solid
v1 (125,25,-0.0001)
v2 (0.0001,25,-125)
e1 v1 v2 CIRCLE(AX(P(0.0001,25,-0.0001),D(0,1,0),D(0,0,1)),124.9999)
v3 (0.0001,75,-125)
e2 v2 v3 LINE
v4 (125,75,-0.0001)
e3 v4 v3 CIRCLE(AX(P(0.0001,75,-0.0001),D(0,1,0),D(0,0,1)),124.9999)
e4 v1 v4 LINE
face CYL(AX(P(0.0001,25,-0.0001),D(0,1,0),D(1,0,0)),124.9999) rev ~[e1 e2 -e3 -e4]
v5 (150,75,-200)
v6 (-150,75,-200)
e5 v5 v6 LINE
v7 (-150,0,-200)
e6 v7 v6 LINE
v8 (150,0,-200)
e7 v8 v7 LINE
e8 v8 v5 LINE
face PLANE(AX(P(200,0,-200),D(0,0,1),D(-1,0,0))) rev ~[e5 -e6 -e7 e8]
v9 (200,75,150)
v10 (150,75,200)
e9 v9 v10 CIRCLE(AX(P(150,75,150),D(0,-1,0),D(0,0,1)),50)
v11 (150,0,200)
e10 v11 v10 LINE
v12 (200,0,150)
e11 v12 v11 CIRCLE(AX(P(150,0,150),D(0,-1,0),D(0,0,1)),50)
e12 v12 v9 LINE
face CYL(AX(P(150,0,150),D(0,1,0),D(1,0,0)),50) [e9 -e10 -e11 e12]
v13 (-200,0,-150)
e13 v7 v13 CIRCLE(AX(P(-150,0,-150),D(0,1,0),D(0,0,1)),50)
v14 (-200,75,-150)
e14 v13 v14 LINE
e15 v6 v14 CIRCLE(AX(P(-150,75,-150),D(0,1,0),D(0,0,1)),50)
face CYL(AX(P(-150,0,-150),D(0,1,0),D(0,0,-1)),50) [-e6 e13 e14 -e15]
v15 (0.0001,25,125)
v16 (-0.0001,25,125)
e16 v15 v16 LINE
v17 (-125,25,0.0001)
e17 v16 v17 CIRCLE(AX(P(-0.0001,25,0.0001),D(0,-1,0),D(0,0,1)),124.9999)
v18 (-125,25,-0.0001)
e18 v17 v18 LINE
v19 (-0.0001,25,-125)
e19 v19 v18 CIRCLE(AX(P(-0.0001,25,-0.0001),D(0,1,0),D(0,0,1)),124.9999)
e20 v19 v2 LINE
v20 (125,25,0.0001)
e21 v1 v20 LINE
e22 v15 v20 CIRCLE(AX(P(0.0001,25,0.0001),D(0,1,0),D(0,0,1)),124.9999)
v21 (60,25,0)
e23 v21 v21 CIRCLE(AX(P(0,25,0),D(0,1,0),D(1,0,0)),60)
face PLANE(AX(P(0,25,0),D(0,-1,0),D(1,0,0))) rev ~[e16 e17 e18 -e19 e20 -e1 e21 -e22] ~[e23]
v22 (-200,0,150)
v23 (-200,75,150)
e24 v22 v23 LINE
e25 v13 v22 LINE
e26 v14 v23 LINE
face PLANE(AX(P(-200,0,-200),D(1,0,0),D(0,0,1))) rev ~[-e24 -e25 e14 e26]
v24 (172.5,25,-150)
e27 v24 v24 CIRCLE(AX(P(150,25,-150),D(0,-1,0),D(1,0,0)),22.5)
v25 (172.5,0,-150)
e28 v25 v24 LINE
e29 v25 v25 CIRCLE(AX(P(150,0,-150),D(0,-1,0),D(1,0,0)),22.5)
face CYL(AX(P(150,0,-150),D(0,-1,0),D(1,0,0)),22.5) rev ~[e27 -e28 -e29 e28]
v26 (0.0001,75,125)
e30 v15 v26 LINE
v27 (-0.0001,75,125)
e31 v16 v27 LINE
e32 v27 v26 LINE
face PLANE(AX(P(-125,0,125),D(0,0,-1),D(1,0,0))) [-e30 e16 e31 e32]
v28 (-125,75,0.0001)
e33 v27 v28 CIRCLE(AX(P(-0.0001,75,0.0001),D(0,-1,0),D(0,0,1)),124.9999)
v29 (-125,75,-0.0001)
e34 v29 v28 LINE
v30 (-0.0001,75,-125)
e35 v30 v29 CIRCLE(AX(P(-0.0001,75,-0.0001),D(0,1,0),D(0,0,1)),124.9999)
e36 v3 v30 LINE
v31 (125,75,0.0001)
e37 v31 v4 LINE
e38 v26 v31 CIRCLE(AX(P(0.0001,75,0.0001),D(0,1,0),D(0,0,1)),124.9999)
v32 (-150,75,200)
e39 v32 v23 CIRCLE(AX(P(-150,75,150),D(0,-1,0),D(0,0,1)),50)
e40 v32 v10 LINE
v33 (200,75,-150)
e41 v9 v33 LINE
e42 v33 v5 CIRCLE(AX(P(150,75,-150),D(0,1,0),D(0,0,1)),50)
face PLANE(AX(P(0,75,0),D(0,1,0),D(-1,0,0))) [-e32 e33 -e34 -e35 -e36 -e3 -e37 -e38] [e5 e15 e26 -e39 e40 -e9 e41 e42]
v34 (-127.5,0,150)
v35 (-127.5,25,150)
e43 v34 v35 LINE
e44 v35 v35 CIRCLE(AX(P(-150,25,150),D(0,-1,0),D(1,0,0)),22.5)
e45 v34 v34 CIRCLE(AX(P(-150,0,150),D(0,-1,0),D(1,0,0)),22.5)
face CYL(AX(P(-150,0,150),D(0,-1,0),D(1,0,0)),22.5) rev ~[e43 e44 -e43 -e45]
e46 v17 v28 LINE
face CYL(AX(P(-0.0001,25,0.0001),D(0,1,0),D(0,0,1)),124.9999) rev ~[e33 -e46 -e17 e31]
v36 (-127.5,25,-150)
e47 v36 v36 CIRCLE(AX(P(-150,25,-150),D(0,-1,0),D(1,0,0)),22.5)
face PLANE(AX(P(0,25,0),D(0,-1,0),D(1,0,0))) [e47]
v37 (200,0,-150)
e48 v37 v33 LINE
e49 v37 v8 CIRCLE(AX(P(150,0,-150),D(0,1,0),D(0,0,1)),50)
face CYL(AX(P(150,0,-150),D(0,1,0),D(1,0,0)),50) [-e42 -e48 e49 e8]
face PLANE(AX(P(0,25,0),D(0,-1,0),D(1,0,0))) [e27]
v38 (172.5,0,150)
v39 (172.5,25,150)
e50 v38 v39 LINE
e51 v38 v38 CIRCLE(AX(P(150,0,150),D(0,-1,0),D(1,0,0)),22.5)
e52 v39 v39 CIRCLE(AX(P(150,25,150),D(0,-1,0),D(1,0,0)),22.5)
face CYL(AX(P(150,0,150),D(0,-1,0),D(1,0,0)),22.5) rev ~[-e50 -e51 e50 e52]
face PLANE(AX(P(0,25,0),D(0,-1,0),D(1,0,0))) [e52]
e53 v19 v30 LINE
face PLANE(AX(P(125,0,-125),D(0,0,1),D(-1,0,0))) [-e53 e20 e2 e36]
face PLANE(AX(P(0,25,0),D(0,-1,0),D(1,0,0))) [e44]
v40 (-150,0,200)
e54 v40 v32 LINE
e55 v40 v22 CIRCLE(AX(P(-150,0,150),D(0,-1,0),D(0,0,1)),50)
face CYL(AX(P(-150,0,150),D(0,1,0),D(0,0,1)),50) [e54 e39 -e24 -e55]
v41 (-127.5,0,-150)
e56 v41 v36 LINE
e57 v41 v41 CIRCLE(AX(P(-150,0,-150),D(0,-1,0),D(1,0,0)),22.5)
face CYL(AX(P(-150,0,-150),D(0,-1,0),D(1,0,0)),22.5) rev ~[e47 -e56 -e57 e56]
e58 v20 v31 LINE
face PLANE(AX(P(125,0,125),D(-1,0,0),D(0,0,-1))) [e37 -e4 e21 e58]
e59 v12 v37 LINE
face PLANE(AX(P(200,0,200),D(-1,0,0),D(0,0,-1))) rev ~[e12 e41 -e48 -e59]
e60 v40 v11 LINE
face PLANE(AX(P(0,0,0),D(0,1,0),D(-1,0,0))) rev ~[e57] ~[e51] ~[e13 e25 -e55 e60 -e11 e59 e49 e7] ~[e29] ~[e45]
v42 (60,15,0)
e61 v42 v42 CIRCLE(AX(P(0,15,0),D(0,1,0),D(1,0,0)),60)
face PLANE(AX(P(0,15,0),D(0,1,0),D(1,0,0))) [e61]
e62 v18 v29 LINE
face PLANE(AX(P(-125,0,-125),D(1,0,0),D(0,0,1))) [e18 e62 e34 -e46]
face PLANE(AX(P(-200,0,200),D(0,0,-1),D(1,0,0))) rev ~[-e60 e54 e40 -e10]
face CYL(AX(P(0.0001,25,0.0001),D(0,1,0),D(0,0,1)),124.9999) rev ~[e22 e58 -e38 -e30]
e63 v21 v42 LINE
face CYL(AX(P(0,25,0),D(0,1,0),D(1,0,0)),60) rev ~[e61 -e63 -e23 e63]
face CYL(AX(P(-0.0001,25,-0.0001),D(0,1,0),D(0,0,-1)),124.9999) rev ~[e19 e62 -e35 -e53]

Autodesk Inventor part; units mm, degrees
ref_plane "YZ Plane" through (0, 0, 0) normal (1, 0, 0) x (0, 1, 0)
ref_plane "XZ Plane" through (0, 0, 0) normal (0, 1, 0) x (-1, 0, 0)
ref_plane "XY Plane" through (0, 0, 0) normal (0, 0, 1) x (1, 0, 0)
sketch "Sketch1" plane through (0, 0, 0) normal (0, 1, 0) x (-1, 0, 0)
  line L0 (125, 125) -> (-125, 125)
  line L1 (-125, 125) -> (-125, -125)
  line L2 (-125, -125) -> (125, -125)
  line L3 (125, -125) -> (125, 125)
  line L4 (125, 125) -> (-125, -125) construction
  line L5 (-125, 125) -> (125, -125) construction
  line L6 (-200, -200) -> (200, -200)
  line L7 (200, -200) -> (200, 200)
  line L8 (200, 200) -> (-200, 200)
  line L9 (-200, 200) -> (-200, -200)
  line L10 (-200, -200) -> (200, 200) construction
  line L11 (200, -200) -> (-200, 200) construction
  point P0 (0, 0)
  dimension "d0" = 250
  dimension "d1" = 250
  dimension "d2" = 400
  dimension "d3" = 400
extrude "Extrusion1" add sketch "Sketch1" along normal blind 75
sketch "Sketch2" plane through (0, 0, 0) normal (0, -1, 0) x (1, 0, 0)
  line L0 (-125, -125) -> (125, -125) projected
  line L1 (125, 125) -> (-125, 125)
  line L2 (-125, 125) -> (-125, -125)
  line L3 (-125, -125) -> (125, -125)
  line L4 (125, -125) -> (125, 125)
  line L5 (125, 125) -> (-125, -125) construction
  line L6 (-125, 125) -> (125, -125) construction
  point P0 (0, 0)
extrude "Extrusion2" add sketch "Sketch2" against normal blind 25
fillet "Fillet1" radius 50 4 edges at (200, 37.5, -200) (200, 37.5, 200) (-200, 37.5, -200) (-200, 37.5, 200)
sketch "Sketch3" plane through (0, 0, 0) normal (0, -1, 0) x (1, 0, 0)
  circle A0 centre (150, -150) radius 22.5
  arc A1 (150, -200) -> (200, -150) centre (150, -150) ccw projected
  circle A2 centre (-150, -150) radius 22.5
  circle A3 centre (-150, 150) radius 22.5
  circle A4 centre (150, 150) radius 22.5
  arc A5 (-200, -150) -> (-150, -200) centre (-150, -150) ccw projected
  arc A6 (-150, 200) -> (-200, 150) centre (-150, 150) ccw projected
  arc A7 (200, 150) -> (150, 200) centre (150, 150) ccw projected
  point P0 (0, 0)
  dimension "d9" = 45
  dimension "d10" = 45
  dimension "d11" = 45
  dimension "d12" = 45
extrude "Extrusion3" cut sketch "Sketch3" against normal blind 25
fillet "Fillet2" radius 125 4 edges at (-125, 50, -125) (-125, 50, 125) (125, 50, -125) (125, 50, 125)
sketch "Sketch4" plane through (0, 25, 0) normal (0, 1, 0) x (1, 0, 0)
  circle A0 centre (0, 0) radius 60
  dimension "d16" = 120
extrude "Extrusion4" cut sketch "Sketch4" against normal blind 10
properties part number "HANDBASE2"
